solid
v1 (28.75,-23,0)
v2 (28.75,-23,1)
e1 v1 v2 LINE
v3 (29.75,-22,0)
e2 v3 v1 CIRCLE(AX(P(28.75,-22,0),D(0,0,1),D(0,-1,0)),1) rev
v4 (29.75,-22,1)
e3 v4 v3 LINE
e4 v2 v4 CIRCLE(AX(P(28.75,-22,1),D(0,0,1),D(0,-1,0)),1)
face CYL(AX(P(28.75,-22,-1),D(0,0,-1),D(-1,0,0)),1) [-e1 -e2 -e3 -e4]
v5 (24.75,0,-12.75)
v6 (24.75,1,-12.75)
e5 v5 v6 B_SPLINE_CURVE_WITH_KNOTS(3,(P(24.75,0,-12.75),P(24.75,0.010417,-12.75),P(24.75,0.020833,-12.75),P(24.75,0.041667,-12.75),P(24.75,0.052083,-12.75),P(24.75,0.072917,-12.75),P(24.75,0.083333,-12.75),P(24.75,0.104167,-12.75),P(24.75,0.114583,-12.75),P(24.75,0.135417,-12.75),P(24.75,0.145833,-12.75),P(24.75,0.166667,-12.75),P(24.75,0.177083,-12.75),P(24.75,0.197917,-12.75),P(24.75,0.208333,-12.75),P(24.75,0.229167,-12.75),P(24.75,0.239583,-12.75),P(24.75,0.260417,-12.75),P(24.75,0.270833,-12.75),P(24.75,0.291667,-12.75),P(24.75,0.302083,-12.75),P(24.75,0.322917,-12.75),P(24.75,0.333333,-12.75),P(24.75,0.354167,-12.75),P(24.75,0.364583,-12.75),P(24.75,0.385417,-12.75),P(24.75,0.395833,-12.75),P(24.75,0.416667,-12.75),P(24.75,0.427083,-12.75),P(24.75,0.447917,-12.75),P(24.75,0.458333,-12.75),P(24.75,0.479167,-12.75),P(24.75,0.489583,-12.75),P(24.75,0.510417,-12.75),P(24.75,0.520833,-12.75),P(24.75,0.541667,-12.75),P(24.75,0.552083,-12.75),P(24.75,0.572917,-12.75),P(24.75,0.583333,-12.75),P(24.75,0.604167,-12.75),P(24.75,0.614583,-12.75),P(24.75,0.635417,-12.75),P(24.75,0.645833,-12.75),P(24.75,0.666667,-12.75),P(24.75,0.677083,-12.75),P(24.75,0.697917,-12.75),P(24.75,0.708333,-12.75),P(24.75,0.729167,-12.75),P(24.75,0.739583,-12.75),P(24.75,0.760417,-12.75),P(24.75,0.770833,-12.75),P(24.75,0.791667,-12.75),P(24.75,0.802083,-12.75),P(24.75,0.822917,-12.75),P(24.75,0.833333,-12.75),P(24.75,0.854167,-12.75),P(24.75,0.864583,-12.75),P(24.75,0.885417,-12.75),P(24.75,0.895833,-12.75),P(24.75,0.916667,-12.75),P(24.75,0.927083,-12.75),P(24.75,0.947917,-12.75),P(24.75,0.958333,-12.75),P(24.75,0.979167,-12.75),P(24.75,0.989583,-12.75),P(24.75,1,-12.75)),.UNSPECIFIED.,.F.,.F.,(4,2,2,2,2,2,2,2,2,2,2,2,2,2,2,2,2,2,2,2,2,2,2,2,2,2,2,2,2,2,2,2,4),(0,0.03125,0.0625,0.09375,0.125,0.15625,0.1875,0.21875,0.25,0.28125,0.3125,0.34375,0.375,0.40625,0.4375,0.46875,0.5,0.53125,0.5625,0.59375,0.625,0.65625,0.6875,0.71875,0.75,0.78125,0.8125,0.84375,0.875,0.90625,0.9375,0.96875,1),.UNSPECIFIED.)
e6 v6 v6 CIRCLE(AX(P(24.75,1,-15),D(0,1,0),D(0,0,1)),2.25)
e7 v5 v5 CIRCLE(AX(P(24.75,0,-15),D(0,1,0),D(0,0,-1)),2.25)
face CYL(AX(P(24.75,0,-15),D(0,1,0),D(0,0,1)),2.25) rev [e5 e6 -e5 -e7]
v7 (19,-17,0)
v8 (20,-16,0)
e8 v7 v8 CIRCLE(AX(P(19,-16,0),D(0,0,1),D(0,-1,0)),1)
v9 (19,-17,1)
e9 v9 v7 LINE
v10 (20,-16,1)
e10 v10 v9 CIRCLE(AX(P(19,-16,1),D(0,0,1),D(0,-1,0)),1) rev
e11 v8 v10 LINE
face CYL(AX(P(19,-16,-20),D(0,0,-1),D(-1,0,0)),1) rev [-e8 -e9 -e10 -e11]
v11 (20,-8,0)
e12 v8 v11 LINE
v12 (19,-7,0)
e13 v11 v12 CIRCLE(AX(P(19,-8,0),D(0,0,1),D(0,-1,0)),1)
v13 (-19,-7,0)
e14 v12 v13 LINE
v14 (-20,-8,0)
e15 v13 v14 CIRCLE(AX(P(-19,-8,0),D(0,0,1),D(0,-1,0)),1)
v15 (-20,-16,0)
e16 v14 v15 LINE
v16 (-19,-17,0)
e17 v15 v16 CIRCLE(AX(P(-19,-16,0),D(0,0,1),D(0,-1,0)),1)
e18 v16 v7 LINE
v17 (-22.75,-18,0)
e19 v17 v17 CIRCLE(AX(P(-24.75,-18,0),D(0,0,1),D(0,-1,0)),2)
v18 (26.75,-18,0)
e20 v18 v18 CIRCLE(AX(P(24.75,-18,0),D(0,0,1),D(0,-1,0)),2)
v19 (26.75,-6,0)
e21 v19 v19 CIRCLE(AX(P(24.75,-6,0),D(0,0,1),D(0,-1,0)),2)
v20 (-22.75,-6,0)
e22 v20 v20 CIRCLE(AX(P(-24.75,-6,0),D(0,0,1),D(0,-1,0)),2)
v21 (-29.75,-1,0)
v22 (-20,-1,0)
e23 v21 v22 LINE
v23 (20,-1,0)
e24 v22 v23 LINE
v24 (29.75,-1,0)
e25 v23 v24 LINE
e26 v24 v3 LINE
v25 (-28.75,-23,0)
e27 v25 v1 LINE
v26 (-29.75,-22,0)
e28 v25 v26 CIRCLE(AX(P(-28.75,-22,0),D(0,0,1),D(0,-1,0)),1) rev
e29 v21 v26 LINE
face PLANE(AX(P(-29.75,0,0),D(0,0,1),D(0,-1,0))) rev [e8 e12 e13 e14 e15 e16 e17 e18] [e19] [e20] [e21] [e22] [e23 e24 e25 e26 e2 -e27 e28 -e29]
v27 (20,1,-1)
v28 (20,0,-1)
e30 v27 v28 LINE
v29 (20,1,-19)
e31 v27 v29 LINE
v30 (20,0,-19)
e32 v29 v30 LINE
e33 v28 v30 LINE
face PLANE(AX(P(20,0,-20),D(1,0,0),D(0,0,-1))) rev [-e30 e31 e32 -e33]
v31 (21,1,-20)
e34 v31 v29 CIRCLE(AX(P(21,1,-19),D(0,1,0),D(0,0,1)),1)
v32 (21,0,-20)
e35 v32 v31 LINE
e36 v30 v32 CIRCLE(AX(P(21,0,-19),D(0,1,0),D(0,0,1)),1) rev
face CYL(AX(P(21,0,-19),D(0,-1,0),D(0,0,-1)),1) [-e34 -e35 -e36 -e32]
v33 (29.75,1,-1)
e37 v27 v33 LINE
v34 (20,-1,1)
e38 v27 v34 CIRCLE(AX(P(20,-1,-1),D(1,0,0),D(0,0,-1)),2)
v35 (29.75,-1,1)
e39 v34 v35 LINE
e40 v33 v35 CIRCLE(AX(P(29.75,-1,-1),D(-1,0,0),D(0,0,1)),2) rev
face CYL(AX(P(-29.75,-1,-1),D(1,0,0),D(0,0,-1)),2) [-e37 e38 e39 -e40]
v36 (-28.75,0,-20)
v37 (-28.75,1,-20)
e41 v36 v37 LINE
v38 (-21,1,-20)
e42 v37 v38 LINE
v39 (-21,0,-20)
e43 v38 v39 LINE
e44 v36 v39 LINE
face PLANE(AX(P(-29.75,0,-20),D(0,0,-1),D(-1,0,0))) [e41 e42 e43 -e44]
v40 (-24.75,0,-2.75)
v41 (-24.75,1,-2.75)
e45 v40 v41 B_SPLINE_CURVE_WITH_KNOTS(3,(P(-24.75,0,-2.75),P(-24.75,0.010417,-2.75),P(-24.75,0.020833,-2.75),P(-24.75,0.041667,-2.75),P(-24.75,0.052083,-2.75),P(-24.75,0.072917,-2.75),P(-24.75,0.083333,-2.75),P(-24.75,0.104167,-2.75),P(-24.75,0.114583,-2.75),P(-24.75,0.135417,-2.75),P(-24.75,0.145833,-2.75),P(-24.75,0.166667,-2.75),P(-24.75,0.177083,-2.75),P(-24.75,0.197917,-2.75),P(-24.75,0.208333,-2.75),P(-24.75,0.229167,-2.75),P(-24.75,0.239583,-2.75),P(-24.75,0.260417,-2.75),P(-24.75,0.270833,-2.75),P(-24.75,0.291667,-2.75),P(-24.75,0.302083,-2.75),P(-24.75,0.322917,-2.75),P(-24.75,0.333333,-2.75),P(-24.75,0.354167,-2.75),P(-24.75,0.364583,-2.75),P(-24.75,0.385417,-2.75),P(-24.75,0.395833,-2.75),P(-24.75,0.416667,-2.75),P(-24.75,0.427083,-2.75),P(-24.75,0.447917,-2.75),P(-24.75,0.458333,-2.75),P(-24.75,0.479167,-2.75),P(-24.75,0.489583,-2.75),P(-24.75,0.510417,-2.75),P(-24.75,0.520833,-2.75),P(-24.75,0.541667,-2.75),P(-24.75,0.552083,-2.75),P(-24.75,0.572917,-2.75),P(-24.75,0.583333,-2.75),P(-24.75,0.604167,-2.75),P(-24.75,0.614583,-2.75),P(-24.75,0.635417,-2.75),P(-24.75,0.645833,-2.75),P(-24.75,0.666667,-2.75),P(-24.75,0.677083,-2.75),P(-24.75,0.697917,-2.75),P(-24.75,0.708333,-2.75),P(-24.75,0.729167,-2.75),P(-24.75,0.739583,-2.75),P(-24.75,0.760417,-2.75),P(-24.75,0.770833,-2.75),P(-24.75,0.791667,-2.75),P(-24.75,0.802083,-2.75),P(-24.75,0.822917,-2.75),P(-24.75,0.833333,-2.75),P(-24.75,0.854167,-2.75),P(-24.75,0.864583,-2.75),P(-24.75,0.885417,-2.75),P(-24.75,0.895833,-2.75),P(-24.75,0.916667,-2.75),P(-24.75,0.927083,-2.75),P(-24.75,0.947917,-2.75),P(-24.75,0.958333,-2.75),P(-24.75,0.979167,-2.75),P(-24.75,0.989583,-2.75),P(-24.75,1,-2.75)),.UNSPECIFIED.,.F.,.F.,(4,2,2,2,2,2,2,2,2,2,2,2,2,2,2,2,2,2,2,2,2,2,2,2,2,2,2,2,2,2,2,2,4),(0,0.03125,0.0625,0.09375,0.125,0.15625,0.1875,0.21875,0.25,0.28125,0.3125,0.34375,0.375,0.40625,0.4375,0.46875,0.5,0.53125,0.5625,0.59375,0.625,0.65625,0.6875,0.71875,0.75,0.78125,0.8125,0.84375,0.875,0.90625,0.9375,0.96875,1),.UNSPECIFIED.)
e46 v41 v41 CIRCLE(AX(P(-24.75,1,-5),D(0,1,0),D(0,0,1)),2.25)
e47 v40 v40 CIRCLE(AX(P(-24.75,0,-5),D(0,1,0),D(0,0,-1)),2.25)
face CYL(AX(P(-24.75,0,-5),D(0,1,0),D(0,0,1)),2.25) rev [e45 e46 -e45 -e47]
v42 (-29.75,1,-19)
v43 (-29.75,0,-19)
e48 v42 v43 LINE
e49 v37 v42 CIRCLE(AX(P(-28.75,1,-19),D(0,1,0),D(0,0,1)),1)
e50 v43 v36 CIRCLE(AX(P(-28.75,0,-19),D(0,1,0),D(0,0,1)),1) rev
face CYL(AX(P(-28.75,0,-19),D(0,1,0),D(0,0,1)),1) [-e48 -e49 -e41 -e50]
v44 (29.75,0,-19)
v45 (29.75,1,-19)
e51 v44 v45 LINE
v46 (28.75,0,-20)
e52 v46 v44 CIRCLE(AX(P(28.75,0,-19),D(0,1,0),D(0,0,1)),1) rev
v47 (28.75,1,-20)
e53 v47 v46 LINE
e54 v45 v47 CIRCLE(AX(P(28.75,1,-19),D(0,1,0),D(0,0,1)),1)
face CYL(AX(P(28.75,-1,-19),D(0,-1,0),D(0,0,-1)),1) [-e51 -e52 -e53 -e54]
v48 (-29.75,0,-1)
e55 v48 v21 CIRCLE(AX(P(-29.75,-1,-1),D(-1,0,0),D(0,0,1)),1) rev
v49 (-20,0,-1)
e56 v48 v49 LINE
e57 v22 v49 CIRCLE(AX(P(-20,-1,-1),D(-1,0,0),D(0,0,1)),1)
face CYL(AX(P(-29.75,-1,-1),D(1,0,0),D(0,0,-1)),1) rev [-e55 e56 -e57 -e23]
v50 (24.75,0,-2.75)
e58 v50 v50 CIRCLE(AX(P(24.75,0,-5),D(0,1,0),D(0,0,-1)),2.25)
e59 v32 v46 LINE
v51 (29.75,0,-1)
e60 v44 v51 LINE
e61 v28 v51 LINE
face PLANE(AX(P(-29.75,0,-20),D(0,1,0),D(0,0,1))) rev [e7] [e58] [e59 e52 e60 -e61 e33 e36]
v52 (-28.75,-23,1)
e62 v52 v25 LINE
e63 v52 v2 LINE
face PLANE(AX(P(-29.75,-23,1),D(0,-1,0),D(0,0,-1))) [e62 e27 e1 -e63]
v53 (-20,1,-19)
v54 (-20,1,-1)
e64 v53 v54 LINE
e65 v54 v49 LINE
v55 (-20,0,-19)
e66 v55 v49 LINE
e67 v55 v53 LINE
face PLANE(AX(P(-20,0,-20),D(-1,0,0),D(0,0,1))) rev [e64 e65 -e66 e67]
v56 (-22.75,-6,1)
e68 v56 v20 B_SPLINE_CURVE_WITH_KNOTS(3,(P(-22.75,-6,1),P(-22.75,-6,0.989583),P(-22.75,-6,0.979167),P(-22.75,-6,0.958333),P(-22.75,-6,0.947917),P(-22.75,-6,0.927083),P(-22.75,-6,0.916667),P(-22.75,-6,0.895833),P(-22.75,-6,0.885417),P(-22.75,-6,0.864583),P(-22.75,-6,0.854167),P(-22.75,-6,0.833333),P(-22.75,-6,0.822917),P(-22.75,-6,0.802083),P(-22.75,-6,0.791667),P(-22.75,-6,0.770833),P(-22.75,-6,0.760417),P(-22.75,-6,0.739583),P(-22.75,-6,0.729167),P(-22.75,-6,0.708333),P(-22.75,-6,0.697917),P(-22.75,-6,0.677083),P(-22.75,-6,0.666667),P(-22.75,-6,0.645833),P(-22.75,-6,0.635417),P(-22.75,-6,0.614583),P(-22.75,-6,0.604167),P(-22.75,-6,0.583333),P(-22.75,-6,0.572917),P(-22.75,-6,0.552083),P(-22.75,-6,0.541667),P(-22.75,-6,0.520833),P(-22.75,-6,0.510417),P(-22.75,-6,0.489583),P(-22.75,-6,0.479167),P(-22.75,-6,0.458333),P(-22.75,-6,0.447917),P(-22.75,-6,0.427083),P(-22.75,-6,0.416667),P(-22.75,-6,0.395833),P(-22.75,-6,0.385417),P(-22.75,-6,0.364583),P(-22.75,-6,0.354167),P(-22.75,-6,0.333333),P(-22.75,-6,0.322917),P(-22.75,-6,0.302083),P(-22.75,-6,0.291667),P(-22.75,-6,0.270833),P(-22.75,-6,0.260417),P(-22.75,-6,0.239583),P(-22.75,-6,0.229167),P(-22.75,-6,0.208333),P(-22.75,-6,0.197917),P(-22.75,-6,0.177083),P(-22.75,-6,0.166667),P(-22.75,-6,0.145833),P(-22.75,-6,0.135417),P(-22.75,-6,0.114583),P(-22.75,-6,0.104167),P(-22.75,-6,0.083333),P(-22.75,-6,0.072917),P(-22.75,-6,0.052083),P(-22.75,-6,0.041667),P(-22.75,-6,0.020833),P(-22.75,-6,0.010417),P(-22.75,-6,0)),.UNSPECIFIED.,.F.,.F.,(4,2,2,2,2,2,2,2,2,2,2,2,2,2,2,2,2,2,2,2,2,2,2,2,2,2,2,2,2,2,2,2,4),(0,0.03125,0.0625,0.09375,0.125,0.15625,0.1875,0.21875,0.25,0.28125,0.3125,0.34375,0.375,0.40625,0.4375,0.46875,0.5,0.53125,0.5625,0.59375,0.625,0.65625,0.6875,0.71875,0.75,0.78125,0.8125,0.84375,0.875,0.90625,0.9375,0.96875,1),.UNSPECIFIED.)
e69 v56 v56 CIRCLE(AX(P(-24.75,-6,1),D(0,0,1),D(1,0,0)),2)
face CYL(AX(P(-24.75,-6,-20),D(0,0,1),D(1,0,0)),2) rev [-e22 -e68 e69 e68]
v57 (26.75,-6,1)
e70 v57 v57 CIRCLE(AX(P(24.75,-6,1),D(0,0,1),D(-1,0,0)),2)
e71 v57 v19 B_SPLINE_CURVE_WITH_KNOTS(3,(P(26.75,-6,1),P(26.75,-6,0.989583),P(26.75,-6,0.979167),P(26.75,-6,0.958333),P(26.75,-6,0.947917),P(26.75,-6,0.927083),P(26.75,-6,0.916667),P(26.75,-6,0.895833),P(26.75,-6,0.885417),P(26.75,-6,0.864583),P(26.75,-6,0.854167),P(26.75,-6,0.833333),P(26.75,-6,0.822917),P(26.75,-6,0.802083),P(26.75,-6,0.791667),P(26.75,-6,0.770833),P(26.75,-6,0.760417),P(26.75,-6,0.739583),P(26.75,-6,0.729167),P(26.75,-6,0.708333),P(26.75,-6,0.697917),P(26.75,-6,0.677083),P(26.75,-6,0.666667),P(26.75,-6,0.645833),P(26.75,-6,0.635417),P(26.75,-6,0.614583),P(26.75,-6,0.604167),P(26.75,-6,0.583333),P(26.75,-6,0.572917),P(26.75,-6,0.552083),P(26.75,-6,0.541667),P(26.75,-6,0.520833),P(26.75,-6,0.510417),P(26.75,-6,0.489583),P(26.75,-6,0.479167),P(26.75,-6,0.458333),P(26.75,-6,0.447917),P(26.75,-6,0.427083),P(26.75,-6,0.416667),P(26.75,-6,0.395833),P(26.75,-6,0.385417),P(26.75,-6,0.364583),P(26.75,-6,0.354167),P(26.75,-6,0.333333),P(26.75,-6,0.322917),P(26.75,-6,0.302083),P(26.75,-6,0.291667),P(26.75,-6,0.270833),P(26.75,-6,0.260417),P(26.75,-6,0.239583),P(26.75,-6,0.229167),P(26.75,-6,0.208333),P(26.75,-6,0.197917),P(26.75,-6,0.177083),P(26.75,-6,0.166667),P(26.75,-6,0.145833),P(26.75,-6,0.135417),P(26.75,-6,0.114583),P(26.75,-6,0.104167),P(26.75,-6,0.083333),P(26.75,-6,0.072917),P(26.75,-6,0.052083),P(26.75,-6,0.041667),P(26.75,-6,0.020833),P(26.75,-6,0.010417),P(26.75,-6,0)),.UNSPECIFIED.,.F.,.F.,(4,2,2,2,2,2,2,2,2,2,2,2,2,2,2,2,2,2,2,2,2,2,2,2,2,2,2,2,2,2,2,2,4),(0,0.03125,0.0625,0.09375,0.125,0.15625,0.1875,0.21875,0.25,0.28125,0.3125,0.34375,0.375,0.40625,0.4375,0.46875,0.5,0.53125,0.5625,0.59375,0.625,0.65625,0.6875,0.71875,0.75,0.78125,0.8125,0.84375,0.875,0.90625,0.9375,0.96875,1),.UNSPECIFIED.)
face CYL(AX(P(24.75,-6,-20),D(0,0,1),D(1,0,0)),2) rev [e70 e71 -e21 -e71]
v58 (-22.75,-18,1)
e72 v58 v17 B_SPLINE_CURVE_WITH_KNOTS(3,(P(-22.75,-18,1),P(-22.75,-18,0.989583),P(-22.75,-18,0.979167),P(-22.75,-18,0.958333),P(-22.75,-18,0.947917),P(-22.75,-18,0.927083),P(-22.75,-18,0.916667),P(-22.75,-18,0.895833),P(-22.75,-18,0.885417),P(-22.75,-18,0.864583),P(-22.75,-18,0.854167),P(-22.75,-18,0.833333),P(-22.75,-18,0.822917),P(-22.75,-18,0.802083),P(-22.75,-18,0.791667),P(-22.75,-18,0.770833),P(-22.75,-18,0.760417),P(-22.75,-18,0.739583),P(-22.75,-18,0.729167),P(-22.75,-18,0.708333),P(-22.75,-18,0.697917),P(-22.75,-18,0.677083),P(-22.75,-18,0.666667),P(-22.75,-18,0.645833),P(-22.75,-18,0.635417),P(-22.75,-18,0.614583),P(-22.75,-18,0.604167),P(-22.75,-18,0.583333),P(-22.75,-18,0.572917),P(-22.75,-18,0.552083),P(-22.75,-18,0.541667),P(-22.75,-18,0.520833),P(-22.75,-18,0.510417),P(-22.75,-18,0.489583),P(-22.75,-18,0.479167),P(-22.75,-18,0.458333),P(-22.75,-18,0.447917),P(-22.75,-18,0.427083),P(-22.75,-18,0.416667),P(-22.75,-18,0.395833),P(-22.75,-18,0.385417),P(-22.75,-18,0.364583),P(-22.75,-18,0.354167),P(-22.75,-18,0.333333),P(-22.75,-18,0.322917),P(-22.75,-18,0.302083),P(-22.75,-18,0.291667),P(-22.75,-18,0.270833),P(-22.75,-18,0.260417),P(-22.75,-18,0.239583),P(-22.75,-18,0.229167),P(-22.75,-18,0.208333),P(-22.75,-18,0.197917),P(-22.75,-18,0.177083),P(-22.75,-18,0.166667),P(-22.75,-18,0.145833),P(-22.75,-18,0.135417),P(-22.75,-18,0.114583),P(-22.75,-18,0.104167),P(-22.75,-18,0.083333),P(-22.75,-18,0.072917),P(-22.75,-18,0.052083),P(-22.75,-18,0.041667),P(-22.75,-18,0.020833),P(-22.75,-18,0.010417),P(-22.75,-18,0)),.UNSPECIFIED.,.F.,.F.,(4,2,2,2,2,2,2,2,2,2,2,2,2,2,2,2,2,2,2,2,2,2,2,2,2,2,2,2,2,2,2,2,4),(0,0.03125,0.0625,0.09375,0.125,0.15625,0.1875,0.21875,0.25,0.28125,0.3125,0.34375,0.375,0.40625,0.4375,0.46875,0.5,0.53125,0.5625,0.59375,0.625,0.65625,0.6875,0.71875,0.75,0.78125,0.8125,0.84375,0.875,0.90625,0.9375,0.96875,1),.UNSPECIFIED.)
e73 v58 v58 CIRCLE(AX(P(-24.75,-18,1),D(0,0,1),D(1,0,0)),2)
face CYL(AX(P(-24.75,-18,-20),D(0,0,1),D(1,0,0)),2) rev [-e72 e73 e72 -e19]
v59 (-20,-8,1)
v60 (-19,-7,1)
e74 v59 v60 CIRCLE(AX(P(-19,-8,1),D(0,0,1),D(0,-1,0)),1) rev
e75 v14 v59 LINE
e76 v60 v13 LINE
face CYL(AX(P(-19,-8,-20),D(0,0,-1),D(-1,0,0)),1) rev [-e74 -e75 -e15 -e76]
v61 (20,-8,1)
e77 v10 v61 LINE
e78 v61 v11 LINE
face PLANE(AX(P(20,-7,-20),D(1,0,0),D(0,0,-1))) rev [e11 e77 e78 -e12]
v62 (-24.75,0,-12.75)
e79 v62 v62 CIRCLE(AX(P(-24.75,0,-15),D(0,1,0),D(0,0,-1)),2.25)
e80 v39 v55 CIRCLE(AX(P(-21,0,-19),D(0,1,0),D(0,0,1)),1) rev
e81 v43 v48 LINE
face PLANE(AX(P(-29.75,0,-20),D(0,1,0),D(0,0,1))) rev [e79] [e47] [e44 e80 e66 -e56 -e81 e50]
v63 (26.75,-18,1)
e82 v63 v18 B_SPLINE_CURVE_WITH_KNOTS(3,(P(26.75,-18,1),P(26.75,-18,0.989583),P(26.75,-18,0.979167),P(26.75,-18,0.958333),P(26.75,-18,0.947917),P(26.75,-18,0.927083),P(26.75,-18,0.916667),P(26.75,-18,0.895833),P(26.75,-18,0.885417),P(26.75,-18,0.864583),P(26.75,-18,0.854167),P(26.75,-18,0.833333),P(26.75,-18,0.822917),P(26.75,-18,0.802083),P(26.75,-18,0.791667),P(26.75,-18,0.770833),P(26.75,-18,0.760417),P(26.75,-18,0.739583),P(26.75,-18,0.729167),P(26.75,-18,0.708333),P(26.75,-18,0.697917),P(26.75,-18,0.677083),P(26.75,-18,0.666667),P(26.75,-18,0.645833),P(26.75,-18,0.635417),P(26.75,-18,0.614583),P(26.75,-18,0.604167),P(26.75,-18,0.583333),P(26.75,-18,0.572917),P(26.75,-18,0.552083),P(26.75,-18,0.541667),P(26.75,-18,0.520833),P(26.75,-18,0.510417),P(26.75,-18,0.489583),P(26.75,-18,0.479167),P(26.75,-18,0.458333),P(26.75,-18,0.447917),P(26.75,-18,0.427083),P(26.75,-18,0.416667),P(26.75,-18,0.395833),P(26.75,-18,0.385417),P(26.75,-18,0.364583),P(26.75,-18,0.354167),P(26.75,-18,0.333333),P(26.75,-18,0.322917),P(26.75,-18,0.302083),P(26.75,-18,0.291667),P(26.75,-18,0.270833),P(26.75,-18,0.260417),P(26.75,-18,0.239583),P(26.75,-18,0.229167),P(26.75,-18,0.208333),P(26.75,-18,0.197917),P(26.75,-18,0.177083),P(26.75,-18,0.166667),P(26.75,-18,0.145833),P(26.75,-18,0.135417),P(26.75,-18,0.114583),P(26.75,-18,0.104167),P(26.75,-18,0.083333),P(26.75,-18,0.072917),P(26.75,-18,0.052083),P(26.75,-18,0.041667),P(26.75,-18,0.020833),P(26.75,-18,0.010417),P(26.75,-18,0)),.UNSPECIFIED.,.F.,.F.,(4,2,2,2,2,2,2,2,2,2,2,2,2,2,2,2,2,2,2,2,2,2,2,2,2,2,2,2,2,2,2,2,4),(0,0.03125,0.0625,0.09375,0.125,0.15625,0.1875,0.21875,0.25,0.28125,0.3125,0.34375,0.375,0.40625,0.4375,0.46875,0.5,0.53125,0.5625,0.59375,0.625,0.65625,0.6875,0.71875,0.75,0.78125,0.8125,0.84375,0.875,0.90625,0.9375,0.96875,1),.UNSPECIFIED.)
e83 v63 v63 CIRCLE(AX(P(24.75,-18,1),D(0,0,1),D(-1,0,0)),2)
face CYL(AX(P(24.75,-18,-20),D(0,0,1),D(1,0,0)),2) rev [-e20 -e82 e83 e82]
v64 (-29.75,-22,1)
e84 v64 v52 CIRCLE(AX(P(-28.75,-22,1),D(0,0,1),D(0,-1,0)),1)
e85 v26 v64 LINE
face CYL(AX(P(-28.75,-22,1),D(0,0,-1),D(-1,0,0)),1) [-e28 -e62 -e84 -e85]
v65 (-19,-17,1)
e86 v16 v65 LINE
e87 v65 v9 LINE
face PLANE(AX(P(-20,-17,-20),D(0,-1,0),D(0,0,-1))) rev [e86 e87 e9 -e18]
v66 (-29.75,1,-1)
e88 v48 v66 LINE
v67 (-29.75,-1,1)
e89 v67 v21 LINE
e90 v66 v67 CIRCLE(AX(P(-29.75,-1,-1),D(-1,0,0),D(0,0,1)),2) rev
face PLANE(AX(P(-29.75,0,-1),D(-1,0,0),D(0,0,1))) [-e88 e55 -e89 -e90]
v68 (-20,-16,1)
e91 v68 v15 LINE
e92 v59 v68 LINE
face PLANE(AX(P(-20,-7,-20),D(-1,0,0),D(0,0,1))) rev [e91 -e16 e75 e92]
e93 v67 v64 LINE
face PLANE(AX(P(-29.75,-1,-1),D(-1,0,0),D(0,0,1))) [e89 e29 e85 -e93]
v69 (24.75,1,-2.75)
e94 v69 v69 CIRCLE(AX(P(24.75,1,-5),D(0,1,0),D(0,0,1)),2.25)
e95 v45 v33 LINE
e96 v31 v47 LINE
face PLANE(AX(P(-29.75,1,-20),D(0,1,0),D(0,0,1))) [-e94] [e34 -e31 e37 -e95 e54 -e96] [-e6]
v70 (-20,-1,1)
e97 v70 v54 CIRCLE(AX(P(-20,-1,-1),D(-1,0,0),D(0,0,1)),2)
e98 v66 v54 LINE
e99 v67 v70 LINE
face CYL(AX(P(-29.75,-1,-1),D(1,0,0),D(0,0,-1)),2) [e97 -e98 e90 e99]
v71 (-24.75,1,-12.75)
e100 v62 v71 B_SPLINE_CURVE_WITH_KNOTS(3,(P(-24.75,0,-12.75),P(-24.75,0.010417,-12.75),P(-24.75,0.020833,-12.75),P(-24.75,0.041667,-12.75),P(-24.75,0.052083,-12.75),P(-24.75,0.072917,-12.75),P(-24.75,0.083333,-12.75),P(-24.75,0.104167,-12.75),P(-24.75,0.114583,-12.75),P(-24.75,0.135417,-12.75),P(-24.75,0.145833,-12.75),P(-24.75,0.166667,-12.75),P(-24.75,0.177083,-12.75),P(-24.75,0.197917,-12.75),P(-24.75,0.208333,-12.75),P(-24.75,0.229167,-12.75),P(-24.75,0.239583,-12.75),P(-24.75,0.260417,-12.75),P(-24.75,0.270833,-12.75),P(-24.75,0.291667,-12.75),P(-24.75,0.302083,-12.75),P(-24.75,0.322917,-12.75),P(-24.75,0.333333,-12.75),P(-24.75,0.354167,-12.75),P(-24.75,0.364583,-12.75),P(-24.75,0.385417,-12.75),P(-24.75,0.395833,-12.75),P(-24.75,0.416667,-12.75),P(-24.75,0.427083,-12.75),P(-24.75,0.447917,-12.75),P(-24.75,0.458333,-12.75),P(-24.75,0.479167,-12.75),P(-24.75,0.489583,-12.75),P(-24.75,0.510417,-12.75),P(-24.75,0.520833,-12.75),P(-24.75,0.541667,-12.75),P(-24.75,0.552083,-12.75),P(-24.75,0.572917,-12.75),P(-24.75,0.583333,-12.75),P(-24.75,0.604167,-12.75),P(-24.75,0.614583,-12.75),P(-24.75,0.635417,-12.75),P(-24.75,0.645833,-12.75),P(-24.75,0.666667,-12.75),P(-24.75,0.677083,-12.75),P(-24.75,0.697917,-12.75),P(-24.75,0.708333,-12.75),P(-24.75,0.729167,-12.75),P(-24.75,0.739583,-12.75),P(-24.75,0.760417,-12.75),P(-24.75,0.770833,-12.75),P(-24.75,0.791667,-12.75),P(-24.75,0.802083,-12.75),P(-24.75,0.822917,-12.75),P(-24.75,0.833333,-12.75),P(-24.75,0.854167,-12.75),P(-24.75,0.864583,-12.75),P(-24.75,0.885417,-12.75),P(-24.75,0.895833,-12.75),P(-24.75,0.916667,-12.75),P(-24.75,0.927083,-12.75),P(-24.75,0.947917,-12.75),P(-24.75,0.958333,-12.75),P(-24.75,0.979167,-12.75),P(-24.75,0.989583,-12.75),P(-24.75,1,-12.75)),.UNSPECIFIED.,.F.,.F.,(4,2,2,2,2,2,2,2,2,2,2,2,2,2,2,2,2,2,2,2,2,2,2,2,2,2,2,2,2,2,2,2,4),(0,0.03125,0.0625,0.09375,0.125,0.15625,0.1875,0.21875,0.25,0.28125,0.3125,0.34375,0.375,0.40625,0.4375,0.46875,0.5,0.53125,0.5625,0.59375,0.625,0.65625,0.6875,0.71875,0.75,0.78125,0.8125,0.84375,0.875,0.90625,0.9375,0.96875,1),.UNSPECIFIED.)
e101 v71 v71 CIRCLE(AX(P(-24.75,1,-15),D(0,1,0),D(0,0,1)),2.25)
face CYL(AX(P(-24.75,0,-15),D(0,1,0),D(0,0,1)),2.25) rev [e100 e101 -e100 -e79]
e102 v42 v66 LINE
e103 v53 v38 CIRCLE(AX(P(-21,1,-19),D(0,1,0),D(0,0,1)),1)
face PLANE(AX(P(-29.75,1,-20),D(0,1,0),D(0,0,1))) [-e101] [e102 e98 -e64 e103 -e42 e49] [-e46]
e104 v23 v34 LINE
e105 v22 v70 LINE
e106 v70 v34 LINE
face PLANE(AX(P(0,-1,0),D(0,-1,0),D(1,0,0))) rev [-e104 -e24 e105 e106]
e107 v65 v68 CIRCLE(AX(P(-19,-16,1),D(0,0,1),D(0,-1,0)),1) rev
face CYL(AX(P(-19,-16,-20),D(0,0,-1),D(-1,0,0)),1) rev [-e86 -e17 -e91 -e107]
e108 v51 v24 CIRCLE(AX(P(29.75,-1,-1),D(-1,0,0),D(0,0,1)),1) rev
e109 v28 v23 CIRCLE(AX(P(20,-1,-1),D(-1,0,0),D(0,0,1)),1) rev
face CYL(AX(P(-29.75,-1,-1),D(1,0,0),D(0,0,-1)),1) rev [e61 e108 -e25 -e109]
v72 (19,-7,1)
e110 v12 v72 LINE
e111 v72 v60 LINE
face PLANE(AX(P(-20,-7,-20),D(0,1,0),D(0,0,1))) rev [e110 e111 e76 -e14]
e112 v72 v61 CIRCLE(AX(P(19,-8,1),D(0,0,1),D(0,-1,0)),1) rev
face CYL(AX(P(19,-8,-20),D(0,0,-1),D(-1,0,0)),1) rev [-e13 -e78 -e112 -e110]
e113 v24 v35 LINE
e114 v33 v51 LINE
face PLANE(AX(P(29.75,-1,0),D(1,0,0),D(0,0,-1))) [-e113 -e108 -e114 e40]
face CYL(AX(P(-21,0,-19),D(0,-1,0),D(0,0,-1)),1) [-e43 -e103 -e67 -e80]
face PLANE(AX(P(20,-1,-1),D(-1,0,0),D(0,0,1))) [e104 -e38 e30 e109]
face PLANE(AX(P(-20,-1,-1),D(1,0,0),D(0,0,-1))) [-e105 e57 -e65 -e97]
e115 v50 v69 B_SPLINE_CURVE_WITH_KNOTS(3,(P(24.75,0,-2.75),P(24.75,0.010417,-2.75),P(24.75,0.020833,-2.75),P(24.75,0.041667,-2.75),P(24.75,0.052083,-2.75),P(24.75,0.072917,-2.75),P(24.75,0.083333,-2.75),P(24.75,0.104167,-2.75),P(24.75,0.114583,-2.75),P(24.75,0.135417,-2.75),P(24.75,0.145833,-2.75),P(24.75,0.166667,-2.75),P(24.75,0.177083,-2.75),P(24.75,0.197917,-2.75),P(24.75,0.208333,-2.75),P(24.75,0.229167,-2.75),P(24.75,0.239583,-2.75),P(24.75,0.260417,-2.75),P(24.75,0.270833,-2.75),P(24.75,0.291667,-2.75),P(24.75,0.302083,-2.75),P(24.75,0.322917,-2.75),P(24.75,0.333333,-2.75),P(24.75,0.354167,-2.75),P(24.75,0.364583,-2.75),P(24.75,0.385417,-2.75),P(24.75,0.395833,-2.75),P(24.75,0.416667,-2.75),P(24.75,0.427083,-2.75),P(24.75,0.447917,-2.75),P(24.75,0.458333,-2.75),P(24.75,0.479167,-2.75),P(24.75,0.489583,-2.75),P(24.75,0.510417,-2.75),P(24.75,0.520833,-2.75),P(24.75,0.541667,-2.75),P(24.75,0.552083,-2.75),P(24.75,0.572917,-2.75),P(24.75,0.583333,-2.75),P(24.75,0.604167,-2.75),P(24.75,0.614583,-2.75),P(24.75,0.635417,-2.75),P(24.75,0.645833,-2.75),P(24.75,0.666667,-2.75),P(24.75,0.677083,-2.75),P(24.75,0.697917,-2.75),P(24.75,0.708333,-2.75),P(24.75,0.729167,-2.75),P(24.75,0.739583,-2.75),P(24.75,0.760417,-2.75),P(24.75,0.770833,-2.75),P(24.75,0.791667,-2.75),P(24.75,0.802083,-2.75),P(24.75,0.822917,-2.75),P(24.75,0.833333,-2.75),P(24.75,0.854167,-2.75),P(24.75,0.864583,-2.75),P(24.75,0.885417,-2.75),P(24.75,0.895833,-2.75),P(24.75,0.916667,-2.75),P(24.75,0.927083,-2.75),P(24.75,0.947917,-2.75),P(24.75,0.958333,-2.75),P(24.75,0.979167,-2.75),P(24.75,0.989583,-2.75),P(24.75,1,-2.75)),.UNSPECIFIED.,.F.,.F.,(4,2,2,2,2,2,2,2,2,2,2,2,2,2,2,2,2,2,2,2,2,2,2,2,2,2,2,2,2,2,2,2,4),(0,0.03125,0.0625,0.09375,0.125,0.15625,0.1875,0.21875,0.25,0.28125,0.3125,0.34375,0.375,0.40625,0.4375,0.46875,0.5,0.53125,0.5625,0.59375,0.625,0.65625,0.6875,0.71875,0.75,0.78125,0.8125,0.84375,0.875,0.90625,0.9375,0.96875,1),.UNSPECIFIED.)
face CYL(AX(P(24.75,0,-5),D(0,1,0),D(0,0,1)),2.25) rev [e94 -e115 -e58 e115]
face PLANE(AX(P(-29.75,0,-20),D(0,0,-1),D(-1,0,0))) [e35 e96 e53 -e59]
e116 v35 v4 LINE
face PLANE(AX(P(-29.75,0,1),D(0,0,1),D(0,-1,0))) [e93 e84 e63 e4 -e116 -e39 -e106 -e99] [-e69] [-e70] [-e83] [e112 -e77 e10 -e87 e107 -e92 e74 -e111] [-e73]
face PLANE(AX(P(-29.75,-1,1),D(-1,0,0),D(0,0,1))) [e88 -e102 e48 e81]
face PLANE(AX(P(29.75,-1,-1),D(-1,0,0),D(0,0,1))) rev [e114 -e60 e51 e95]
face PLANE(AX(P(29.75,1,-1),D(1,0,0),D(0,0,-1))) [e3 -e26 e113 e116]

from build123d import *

# Parameters (mm, degrees)
SM_BASE_FLANGE_1_DEPTH  = 29.75
CUT_EXTRUDE_START       = -2
CUT_EXTRUDE_1_OUTLINE_W = 40
CUT_EXTRUDE_1_OUTLINE_H = 22
CUT_EXTRUDE_1_OUTLINE_R = 2.25
CUT_EXTRUDE_1_DEPTH     = 2
SKETCH_7_R              = 2
SKETCH_7_W              = 40
SKETCH_7_H              = 10
CUT_EXTRUDE_4_DEPTH     = 44.070436497
FILLET_1_R              = 1


# Read off the part's stored shape, not the designer's step: 切除-拉伸1
# Sheet-metal steps are written as plain solids
with BuildPart() as part:
    # Sketch 1 → 基体-法兰1 (new, symmetric)
    with BuildSketch(Plane.ZY):
        with BuildLine():
            Line((-20, 0), (-1, 0))
            ThreePointArc((-1, 0), (-0.292893219, -0.292893219), (0, -1))
            Line((0, -1), (0, -23))
            Line((0, -23), (1, -23))
            Line((1, -23), (1, -1))
            ThreePointArc((1, -1), (0.414213562, 0.414213562), (-1, 1))
            Line((-1, 1), (-20, 1))
            Line((-20, 1), (-20, 0))
        make_face()
    extrude(amount=SM_BASE_FLANGE_1_DEPTH, both=True)

    # 切除-拉伸1 outline → 切除-拉伸1 (cut)
    with BuildSketch(Plane(origin=(0, 1, 0), x_dir=(1, 0, 0), z_dir=(0, 1, 0)).offset(CUT_EXTRUDE_START)):
        with Locations((0, 9)):
            Rectangle(CUT_EXTRUDE_1_OUTLINE_W, CUT_EXTRUDE_1_OUTLINE_H)
        with Locations((-24.75, 15)):
            Circle(CUT_EXTRUDE_1_OUTLINE_R)
        with Locations((24.75, 15)):
            Circle(CUT_EXTRUDE_1_OUTLINE_R)
        with Locations((24.75, 5)):
            Circle(CUT_EXTRUDE_1_OUTLINE_R)
        with Locations((-24.75, 5)):
            Circle(CUT_EXTRUDE_1_OUTLINE_R)
    extrude(amount=CUT_EXTRUDE_1_DEPTH, mode=Mode.SUBTRACT)

    # 草图7 → 切除-拉伸4 (cut, through all)
    with BuildSketch(Plane.XY.offset(1)):
        with Locations((-24.75, -6)):
            Circle(SKETCH_7_R)
        with Locations((-24.75, -18)):
            Circle(SKETCH_7_R)
        with Locations((24.75, -18)):
            Circle(SKETCH_7_R)
        with Locations((24.75, -6)):
            Circle(SKETCH_7_R)
        with Locations((0, -12)):
            Rectangle(SKETCH_7_W, SKETCH_7_H)
    extrude(amount=-CUT_EXTRUDE_4_DEPTH, mode=Mode.SUBTRACT)

    # 圆角1
    fillet_1_edges = [part.edges().sort_by_distance(p)[0] for p in [
        (-20, -17, 0.5),
        (-20, -7, 0.5),
        (20, -7, 0.5),
        (20, -17, 0.5),
        (-29.75, 0.5, -20),
        (20, 0.5, -20),
        (-20, 0.5, -20),
        (-29.75, -23, 0.5),
        (29.75, 0.5, -20),
        (29.75, -23, 0.5),
    ]]
    fillet(fillet_1_edges, radius=FILLET_1_R)


solid = part.part
